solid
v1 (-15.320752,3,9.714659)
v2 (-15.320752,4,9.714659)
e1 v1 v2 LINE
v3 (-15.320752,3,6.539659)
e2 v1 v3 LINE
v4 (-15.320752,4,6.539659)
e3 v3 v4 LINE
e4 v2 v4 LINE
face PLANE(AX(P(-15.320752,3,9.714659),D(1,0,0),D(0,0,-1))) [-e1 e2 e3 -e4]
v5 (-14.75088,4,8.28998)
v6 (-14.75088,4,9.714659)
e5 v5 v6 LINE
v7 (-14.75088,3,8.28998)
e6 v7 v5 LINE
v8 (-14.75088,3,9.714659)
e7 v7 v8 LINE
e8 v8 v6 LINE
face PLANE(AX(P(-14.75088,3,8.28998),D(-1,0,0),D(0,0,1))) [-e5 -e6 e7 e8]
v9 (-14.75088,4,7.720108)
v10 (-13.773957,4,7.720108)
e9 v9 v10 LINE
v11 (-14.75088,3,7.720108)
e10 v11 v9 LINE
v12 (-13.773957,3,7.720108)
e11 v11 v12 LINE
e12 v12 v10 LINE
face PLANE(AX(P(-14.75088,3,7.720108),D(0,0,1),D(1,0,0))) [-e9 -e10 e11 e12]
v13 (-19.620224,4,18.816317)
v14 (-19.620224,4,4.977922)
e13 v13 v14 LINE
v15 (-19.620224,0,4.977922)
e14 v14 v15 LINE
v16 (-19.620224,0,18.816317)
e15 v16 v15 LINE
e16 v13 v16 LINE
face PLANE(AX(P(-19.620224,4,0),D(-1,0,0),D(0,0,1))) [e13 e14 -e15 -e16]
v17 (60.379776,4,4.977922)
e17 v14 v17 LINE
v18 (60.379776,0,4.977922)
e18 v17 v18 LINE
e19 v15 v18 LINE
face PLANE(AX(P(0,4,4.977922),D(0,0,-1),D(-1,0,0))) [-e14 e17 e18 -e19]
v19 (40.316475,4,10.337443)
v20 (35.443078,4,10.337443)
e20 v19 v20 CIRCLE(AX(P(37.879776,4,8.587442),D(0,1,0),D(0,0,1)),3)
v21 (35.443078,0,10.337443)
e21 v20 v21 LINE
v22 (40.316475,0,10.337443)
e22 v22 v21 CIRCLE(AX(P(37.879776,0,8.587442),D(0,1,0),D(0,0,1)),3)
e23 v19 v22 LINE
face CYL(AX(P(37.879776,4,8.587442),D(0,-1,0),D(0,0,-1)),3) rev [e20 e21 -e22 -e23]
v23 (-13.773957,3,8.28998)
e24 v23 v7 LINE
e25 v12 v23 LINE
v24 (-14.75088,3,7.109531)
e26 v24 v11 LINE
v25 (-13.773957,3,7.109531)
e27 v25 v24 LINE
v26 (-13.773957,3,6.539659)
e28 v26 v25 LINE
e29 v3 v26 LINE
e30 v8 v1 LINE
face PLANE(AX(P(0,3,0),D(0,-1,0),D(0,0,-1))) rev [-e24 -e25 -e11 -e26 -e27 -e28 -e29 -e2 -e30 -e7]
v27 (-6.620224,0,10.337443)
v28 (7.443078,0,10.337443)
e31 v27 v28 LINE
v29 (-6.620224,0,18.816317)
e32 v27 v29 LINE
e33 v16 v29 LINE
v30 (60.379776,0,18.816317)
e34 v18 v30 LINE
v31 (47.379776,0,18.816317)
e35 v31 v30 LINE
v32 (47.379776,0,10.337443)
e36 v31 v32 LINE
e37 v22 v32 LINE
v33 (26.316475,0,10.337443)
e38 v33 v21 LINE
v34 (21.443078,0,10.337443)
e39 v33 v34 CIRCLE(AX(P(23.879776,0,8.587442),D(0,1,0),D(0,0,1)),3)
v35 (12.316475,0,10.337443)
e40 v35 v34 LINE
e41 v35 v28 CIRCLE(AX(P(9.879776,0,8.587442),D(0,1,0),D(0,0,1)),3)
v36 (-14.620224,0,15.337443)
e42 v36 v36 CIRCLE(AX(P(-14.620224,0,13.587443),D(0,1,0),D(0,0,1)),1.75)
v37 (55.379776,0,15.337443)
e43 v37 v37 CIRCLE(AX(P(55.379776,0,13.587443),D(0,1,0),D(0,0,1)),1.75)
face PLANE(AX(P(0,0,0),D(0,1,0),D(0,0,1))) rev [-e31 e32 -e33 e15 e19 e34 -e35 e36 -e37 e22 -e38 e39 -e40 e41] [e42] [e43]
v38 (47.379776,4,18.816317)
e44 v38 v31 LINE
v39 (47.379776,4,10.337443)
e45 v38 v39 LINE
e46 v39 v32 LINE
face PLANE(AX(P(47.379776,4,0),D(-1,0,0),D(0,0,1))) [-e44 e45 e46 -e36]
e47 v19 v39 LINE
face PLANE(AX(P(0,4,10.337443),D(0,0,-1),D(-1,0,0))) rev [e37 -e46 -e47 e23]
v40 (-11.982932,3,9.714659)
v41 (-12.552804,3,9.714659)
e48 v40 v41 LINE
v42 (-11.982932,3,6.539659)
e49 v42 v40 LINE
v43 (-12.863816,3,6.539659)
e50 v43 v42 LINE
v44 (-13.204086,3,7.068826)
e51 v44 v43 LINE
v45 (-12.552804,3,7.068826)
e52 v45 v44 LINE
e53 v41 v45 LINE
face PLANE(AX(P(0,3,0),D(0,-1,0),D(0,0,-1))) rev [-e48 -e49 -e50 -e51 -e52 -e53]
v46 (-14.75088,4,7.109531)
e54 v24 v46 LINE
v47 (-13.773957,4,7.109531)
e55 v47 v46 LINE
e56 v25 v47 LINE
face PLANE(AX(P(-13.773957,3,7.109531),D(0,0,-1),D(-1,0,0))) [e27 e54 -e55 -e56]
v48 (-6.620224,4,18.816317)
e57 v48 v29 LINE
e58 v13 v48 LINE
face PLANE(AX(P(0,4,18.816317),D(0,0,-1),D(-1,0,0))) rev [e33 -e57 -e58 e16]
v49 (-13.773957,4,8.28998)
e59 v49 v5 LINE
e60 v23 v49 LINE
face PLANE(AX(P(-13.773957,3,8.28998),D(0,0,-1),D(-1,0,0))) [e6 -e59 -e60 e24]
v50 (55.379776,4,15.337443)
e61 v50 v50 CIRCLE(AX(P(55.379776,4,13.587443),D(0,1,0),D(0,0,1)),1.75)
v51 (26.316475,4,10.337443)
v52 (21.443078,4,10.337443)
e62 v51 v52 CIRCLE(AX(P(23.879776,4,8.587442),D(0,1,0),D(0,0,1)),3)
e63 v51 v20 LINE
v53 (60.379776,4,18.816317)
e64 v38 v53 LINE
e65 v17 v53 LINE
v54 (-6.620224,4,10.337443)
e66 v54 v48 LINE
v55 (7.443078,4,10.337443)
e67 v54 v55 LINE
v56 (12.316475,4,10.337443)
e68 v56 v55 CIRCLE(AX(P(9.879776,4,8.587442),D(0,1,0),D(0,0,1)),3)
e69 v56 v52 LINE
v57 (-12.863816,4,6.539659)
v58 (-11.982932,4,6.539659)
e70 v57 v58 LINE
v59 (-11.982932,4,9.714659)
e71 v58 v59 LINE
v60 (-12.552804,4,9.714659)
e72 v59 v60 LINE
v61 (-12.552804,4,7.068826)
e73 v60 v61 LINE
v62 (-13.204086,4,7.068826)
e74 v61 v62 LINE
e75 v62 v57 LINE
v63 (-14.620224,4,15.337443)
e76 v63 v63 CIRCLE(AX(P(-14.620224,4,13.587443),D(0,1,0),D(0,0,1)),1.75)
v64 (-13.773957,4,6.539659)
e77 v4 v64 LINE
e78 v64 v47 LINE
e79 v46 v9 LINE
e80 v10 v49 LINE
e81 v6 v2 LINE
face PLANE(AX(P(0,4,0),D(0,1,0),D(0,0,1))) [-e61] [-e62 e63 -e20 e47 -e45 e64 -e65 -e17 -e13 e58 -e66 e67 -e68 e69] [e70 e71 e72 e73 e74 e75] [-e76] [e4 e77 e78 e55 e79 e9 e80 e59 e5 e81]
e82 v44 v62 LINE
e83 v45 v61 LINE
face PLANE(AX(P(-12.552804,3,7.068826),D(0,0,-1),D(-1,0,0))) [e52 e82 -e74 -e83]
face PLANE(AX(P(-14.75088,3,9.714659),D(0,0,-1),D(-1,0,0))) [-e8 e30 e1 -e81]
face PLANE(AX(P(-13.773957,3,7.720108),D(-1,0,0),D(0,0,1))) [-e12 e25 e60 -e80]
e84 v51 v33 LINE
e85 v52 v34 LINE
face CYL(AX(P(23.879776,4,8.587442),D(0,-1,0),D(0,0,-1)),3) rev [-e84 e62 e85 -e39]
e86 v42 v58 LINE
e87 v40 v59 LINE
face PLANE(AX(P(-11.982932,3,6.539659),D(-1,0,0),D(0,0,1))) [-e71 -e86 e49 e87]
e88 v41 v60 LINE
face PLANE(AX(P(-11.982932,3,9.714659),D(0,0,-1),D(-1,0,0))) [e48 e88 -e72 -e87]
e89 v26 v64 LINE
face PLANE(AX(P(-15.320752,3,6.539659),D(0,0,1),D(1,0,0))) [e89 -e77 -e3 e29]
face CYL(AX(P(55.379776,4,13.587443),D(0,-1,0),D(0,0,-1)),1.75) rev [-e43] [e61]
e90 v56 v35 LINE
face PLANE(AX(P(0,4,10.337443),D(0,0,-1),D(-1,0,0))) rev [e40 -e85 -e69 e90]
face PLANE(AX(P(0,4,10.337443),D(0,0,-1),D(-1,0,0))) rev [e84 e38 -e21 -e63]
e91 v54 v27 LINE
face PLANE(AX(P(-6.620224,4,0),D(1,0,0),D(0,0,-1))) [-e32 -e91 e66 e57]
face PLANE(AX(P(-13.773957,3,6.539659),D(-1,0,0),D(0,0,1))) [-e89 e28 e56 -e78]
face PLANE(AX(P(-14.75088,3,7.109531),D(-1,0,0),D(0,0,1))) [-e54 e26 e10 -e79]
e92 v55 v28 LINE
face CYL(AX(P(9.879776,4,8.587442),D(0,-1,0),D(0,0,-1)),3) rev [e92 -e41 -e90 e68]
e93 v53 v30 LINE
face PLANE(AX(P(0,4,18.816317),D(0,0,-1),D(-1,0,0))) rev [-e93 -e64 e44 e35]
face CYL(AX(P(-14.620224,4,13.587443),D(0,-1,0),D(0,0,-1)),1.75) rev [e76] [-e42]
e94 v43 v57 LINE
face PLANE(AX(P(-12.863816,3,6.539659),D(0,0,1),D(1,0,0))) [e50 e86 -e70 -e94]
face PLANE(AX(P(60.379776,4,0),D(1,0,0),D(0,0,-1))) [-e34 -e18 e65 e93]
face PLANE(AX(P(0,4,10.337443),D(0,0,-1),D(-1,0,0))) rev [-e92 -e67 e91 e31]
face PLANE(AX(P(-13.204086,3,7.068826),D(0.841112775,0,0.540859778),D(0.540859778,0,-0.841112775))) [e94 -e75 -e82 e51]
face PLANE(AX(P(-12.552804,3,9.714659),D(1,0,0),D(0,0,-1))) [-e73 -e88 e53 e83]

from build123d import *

# Parameters (mm, degrees)
SKETCH1_R           = 1.75
BOSS_EXTRUDE1_DEPTH = 4
CUT_EXTRUDE1_DEPTH  = 1


with BuildPart() as part:
    # Sketch1 → Boss-Extrude1 (new body)
    with BuildSketch(Plane(origin=(0, 0, 0), x_dir=(1, 0, 0), z_dir=(0, 1, 0))):
        with BuildLine():
            Line((-19.620223818, -18.81631662), (-6.620223818, -18.81631662))
            Line((-6.620223818, -18.81631662), (-6.620223818, -10.337442774))
            Line((-6.620223818, -10.337442774), (7.443077754, -10.337442546))
            ThreePointArc((7.443077754, -10.337442546), (9.879776182, -5.587442326), (12.31647461, -10.337442546))
            Line((12.31647461, -10.337442546), (21.443077647, -10.337442397))
            ThreePointArc((21.443077647, -10.337442397), (23.879776182, -5.587442326), (26.316474717, -10.337442397))
            Line((26.316474717, -10.337442397), (35.443077673, -10.337442433))
            ThreePointArc((35.443077673, -10.337442433), (37.879776182, -5.587442326), (40.316474692, -10.337442433))
            Line((40.316474692, -10.337442433), (47.379776182, -10.33744254))
            Line((47.379776182, -10.33744254), (47.379776182, -18.81631662))
            Line((47.379776182, -18.81631662), (60.379776182, -18.81631662))
            Line((60.379776182, -18.81631662), (60.379776182, -4.977921711))
            Line((60.379776182, -4.977921711), (-19.620223818, -4.977921711))
            Line((-19.620223818, -4.977921711), (-19.620223818, -18.81631662))
        make_face()
        with Locations((-14.620223818, -13.58744255)):
            Circle(SKETCH1_R, mode=Mode.SUBTRACT)
        with Locations((55.379776182, -13.58744255)):
            Circle(SKETCH1_R, mode=Mode.SUBTRACT)
    extrude(amount=BOSS_EXTRUDE1_DEPTH)

    # Sketch2 → Cut-Extrude1 (cut)
    with BuildSketch(Plane(origin=(0, 4, 0), x_dir=(1, 0, 0), z_dir=(0, 1, 0))):
        Polygon((-15.320752279, -6.539659084), (-13.773957408, -6.539659084), (-13.773957408, -7.109530878), (-14.750880484, -7.109530878), (-14.750880484, -7.720107802), (-13.773957408, -7.720107802), (-13.773957408, -8.289979596), (-14.750880484, -8.289979596), (-14.750880484, -9.714659084), (-15.320752279, -9.714659084), align=None)
        Polygon((-12.863816182, -6.539659084), (-11.982931767, -6.539659084), (-11.982931767, -9.714659084), (-12.552803561, -9.714659084), (-12.552803561, -7.06882575), (-13.204085613, -7.06882575), align=None)
    extrude(amount=-CUT_EXTRUDE1_DEPTH, mode=Mode.SUBTRACT)


solid = part.part
